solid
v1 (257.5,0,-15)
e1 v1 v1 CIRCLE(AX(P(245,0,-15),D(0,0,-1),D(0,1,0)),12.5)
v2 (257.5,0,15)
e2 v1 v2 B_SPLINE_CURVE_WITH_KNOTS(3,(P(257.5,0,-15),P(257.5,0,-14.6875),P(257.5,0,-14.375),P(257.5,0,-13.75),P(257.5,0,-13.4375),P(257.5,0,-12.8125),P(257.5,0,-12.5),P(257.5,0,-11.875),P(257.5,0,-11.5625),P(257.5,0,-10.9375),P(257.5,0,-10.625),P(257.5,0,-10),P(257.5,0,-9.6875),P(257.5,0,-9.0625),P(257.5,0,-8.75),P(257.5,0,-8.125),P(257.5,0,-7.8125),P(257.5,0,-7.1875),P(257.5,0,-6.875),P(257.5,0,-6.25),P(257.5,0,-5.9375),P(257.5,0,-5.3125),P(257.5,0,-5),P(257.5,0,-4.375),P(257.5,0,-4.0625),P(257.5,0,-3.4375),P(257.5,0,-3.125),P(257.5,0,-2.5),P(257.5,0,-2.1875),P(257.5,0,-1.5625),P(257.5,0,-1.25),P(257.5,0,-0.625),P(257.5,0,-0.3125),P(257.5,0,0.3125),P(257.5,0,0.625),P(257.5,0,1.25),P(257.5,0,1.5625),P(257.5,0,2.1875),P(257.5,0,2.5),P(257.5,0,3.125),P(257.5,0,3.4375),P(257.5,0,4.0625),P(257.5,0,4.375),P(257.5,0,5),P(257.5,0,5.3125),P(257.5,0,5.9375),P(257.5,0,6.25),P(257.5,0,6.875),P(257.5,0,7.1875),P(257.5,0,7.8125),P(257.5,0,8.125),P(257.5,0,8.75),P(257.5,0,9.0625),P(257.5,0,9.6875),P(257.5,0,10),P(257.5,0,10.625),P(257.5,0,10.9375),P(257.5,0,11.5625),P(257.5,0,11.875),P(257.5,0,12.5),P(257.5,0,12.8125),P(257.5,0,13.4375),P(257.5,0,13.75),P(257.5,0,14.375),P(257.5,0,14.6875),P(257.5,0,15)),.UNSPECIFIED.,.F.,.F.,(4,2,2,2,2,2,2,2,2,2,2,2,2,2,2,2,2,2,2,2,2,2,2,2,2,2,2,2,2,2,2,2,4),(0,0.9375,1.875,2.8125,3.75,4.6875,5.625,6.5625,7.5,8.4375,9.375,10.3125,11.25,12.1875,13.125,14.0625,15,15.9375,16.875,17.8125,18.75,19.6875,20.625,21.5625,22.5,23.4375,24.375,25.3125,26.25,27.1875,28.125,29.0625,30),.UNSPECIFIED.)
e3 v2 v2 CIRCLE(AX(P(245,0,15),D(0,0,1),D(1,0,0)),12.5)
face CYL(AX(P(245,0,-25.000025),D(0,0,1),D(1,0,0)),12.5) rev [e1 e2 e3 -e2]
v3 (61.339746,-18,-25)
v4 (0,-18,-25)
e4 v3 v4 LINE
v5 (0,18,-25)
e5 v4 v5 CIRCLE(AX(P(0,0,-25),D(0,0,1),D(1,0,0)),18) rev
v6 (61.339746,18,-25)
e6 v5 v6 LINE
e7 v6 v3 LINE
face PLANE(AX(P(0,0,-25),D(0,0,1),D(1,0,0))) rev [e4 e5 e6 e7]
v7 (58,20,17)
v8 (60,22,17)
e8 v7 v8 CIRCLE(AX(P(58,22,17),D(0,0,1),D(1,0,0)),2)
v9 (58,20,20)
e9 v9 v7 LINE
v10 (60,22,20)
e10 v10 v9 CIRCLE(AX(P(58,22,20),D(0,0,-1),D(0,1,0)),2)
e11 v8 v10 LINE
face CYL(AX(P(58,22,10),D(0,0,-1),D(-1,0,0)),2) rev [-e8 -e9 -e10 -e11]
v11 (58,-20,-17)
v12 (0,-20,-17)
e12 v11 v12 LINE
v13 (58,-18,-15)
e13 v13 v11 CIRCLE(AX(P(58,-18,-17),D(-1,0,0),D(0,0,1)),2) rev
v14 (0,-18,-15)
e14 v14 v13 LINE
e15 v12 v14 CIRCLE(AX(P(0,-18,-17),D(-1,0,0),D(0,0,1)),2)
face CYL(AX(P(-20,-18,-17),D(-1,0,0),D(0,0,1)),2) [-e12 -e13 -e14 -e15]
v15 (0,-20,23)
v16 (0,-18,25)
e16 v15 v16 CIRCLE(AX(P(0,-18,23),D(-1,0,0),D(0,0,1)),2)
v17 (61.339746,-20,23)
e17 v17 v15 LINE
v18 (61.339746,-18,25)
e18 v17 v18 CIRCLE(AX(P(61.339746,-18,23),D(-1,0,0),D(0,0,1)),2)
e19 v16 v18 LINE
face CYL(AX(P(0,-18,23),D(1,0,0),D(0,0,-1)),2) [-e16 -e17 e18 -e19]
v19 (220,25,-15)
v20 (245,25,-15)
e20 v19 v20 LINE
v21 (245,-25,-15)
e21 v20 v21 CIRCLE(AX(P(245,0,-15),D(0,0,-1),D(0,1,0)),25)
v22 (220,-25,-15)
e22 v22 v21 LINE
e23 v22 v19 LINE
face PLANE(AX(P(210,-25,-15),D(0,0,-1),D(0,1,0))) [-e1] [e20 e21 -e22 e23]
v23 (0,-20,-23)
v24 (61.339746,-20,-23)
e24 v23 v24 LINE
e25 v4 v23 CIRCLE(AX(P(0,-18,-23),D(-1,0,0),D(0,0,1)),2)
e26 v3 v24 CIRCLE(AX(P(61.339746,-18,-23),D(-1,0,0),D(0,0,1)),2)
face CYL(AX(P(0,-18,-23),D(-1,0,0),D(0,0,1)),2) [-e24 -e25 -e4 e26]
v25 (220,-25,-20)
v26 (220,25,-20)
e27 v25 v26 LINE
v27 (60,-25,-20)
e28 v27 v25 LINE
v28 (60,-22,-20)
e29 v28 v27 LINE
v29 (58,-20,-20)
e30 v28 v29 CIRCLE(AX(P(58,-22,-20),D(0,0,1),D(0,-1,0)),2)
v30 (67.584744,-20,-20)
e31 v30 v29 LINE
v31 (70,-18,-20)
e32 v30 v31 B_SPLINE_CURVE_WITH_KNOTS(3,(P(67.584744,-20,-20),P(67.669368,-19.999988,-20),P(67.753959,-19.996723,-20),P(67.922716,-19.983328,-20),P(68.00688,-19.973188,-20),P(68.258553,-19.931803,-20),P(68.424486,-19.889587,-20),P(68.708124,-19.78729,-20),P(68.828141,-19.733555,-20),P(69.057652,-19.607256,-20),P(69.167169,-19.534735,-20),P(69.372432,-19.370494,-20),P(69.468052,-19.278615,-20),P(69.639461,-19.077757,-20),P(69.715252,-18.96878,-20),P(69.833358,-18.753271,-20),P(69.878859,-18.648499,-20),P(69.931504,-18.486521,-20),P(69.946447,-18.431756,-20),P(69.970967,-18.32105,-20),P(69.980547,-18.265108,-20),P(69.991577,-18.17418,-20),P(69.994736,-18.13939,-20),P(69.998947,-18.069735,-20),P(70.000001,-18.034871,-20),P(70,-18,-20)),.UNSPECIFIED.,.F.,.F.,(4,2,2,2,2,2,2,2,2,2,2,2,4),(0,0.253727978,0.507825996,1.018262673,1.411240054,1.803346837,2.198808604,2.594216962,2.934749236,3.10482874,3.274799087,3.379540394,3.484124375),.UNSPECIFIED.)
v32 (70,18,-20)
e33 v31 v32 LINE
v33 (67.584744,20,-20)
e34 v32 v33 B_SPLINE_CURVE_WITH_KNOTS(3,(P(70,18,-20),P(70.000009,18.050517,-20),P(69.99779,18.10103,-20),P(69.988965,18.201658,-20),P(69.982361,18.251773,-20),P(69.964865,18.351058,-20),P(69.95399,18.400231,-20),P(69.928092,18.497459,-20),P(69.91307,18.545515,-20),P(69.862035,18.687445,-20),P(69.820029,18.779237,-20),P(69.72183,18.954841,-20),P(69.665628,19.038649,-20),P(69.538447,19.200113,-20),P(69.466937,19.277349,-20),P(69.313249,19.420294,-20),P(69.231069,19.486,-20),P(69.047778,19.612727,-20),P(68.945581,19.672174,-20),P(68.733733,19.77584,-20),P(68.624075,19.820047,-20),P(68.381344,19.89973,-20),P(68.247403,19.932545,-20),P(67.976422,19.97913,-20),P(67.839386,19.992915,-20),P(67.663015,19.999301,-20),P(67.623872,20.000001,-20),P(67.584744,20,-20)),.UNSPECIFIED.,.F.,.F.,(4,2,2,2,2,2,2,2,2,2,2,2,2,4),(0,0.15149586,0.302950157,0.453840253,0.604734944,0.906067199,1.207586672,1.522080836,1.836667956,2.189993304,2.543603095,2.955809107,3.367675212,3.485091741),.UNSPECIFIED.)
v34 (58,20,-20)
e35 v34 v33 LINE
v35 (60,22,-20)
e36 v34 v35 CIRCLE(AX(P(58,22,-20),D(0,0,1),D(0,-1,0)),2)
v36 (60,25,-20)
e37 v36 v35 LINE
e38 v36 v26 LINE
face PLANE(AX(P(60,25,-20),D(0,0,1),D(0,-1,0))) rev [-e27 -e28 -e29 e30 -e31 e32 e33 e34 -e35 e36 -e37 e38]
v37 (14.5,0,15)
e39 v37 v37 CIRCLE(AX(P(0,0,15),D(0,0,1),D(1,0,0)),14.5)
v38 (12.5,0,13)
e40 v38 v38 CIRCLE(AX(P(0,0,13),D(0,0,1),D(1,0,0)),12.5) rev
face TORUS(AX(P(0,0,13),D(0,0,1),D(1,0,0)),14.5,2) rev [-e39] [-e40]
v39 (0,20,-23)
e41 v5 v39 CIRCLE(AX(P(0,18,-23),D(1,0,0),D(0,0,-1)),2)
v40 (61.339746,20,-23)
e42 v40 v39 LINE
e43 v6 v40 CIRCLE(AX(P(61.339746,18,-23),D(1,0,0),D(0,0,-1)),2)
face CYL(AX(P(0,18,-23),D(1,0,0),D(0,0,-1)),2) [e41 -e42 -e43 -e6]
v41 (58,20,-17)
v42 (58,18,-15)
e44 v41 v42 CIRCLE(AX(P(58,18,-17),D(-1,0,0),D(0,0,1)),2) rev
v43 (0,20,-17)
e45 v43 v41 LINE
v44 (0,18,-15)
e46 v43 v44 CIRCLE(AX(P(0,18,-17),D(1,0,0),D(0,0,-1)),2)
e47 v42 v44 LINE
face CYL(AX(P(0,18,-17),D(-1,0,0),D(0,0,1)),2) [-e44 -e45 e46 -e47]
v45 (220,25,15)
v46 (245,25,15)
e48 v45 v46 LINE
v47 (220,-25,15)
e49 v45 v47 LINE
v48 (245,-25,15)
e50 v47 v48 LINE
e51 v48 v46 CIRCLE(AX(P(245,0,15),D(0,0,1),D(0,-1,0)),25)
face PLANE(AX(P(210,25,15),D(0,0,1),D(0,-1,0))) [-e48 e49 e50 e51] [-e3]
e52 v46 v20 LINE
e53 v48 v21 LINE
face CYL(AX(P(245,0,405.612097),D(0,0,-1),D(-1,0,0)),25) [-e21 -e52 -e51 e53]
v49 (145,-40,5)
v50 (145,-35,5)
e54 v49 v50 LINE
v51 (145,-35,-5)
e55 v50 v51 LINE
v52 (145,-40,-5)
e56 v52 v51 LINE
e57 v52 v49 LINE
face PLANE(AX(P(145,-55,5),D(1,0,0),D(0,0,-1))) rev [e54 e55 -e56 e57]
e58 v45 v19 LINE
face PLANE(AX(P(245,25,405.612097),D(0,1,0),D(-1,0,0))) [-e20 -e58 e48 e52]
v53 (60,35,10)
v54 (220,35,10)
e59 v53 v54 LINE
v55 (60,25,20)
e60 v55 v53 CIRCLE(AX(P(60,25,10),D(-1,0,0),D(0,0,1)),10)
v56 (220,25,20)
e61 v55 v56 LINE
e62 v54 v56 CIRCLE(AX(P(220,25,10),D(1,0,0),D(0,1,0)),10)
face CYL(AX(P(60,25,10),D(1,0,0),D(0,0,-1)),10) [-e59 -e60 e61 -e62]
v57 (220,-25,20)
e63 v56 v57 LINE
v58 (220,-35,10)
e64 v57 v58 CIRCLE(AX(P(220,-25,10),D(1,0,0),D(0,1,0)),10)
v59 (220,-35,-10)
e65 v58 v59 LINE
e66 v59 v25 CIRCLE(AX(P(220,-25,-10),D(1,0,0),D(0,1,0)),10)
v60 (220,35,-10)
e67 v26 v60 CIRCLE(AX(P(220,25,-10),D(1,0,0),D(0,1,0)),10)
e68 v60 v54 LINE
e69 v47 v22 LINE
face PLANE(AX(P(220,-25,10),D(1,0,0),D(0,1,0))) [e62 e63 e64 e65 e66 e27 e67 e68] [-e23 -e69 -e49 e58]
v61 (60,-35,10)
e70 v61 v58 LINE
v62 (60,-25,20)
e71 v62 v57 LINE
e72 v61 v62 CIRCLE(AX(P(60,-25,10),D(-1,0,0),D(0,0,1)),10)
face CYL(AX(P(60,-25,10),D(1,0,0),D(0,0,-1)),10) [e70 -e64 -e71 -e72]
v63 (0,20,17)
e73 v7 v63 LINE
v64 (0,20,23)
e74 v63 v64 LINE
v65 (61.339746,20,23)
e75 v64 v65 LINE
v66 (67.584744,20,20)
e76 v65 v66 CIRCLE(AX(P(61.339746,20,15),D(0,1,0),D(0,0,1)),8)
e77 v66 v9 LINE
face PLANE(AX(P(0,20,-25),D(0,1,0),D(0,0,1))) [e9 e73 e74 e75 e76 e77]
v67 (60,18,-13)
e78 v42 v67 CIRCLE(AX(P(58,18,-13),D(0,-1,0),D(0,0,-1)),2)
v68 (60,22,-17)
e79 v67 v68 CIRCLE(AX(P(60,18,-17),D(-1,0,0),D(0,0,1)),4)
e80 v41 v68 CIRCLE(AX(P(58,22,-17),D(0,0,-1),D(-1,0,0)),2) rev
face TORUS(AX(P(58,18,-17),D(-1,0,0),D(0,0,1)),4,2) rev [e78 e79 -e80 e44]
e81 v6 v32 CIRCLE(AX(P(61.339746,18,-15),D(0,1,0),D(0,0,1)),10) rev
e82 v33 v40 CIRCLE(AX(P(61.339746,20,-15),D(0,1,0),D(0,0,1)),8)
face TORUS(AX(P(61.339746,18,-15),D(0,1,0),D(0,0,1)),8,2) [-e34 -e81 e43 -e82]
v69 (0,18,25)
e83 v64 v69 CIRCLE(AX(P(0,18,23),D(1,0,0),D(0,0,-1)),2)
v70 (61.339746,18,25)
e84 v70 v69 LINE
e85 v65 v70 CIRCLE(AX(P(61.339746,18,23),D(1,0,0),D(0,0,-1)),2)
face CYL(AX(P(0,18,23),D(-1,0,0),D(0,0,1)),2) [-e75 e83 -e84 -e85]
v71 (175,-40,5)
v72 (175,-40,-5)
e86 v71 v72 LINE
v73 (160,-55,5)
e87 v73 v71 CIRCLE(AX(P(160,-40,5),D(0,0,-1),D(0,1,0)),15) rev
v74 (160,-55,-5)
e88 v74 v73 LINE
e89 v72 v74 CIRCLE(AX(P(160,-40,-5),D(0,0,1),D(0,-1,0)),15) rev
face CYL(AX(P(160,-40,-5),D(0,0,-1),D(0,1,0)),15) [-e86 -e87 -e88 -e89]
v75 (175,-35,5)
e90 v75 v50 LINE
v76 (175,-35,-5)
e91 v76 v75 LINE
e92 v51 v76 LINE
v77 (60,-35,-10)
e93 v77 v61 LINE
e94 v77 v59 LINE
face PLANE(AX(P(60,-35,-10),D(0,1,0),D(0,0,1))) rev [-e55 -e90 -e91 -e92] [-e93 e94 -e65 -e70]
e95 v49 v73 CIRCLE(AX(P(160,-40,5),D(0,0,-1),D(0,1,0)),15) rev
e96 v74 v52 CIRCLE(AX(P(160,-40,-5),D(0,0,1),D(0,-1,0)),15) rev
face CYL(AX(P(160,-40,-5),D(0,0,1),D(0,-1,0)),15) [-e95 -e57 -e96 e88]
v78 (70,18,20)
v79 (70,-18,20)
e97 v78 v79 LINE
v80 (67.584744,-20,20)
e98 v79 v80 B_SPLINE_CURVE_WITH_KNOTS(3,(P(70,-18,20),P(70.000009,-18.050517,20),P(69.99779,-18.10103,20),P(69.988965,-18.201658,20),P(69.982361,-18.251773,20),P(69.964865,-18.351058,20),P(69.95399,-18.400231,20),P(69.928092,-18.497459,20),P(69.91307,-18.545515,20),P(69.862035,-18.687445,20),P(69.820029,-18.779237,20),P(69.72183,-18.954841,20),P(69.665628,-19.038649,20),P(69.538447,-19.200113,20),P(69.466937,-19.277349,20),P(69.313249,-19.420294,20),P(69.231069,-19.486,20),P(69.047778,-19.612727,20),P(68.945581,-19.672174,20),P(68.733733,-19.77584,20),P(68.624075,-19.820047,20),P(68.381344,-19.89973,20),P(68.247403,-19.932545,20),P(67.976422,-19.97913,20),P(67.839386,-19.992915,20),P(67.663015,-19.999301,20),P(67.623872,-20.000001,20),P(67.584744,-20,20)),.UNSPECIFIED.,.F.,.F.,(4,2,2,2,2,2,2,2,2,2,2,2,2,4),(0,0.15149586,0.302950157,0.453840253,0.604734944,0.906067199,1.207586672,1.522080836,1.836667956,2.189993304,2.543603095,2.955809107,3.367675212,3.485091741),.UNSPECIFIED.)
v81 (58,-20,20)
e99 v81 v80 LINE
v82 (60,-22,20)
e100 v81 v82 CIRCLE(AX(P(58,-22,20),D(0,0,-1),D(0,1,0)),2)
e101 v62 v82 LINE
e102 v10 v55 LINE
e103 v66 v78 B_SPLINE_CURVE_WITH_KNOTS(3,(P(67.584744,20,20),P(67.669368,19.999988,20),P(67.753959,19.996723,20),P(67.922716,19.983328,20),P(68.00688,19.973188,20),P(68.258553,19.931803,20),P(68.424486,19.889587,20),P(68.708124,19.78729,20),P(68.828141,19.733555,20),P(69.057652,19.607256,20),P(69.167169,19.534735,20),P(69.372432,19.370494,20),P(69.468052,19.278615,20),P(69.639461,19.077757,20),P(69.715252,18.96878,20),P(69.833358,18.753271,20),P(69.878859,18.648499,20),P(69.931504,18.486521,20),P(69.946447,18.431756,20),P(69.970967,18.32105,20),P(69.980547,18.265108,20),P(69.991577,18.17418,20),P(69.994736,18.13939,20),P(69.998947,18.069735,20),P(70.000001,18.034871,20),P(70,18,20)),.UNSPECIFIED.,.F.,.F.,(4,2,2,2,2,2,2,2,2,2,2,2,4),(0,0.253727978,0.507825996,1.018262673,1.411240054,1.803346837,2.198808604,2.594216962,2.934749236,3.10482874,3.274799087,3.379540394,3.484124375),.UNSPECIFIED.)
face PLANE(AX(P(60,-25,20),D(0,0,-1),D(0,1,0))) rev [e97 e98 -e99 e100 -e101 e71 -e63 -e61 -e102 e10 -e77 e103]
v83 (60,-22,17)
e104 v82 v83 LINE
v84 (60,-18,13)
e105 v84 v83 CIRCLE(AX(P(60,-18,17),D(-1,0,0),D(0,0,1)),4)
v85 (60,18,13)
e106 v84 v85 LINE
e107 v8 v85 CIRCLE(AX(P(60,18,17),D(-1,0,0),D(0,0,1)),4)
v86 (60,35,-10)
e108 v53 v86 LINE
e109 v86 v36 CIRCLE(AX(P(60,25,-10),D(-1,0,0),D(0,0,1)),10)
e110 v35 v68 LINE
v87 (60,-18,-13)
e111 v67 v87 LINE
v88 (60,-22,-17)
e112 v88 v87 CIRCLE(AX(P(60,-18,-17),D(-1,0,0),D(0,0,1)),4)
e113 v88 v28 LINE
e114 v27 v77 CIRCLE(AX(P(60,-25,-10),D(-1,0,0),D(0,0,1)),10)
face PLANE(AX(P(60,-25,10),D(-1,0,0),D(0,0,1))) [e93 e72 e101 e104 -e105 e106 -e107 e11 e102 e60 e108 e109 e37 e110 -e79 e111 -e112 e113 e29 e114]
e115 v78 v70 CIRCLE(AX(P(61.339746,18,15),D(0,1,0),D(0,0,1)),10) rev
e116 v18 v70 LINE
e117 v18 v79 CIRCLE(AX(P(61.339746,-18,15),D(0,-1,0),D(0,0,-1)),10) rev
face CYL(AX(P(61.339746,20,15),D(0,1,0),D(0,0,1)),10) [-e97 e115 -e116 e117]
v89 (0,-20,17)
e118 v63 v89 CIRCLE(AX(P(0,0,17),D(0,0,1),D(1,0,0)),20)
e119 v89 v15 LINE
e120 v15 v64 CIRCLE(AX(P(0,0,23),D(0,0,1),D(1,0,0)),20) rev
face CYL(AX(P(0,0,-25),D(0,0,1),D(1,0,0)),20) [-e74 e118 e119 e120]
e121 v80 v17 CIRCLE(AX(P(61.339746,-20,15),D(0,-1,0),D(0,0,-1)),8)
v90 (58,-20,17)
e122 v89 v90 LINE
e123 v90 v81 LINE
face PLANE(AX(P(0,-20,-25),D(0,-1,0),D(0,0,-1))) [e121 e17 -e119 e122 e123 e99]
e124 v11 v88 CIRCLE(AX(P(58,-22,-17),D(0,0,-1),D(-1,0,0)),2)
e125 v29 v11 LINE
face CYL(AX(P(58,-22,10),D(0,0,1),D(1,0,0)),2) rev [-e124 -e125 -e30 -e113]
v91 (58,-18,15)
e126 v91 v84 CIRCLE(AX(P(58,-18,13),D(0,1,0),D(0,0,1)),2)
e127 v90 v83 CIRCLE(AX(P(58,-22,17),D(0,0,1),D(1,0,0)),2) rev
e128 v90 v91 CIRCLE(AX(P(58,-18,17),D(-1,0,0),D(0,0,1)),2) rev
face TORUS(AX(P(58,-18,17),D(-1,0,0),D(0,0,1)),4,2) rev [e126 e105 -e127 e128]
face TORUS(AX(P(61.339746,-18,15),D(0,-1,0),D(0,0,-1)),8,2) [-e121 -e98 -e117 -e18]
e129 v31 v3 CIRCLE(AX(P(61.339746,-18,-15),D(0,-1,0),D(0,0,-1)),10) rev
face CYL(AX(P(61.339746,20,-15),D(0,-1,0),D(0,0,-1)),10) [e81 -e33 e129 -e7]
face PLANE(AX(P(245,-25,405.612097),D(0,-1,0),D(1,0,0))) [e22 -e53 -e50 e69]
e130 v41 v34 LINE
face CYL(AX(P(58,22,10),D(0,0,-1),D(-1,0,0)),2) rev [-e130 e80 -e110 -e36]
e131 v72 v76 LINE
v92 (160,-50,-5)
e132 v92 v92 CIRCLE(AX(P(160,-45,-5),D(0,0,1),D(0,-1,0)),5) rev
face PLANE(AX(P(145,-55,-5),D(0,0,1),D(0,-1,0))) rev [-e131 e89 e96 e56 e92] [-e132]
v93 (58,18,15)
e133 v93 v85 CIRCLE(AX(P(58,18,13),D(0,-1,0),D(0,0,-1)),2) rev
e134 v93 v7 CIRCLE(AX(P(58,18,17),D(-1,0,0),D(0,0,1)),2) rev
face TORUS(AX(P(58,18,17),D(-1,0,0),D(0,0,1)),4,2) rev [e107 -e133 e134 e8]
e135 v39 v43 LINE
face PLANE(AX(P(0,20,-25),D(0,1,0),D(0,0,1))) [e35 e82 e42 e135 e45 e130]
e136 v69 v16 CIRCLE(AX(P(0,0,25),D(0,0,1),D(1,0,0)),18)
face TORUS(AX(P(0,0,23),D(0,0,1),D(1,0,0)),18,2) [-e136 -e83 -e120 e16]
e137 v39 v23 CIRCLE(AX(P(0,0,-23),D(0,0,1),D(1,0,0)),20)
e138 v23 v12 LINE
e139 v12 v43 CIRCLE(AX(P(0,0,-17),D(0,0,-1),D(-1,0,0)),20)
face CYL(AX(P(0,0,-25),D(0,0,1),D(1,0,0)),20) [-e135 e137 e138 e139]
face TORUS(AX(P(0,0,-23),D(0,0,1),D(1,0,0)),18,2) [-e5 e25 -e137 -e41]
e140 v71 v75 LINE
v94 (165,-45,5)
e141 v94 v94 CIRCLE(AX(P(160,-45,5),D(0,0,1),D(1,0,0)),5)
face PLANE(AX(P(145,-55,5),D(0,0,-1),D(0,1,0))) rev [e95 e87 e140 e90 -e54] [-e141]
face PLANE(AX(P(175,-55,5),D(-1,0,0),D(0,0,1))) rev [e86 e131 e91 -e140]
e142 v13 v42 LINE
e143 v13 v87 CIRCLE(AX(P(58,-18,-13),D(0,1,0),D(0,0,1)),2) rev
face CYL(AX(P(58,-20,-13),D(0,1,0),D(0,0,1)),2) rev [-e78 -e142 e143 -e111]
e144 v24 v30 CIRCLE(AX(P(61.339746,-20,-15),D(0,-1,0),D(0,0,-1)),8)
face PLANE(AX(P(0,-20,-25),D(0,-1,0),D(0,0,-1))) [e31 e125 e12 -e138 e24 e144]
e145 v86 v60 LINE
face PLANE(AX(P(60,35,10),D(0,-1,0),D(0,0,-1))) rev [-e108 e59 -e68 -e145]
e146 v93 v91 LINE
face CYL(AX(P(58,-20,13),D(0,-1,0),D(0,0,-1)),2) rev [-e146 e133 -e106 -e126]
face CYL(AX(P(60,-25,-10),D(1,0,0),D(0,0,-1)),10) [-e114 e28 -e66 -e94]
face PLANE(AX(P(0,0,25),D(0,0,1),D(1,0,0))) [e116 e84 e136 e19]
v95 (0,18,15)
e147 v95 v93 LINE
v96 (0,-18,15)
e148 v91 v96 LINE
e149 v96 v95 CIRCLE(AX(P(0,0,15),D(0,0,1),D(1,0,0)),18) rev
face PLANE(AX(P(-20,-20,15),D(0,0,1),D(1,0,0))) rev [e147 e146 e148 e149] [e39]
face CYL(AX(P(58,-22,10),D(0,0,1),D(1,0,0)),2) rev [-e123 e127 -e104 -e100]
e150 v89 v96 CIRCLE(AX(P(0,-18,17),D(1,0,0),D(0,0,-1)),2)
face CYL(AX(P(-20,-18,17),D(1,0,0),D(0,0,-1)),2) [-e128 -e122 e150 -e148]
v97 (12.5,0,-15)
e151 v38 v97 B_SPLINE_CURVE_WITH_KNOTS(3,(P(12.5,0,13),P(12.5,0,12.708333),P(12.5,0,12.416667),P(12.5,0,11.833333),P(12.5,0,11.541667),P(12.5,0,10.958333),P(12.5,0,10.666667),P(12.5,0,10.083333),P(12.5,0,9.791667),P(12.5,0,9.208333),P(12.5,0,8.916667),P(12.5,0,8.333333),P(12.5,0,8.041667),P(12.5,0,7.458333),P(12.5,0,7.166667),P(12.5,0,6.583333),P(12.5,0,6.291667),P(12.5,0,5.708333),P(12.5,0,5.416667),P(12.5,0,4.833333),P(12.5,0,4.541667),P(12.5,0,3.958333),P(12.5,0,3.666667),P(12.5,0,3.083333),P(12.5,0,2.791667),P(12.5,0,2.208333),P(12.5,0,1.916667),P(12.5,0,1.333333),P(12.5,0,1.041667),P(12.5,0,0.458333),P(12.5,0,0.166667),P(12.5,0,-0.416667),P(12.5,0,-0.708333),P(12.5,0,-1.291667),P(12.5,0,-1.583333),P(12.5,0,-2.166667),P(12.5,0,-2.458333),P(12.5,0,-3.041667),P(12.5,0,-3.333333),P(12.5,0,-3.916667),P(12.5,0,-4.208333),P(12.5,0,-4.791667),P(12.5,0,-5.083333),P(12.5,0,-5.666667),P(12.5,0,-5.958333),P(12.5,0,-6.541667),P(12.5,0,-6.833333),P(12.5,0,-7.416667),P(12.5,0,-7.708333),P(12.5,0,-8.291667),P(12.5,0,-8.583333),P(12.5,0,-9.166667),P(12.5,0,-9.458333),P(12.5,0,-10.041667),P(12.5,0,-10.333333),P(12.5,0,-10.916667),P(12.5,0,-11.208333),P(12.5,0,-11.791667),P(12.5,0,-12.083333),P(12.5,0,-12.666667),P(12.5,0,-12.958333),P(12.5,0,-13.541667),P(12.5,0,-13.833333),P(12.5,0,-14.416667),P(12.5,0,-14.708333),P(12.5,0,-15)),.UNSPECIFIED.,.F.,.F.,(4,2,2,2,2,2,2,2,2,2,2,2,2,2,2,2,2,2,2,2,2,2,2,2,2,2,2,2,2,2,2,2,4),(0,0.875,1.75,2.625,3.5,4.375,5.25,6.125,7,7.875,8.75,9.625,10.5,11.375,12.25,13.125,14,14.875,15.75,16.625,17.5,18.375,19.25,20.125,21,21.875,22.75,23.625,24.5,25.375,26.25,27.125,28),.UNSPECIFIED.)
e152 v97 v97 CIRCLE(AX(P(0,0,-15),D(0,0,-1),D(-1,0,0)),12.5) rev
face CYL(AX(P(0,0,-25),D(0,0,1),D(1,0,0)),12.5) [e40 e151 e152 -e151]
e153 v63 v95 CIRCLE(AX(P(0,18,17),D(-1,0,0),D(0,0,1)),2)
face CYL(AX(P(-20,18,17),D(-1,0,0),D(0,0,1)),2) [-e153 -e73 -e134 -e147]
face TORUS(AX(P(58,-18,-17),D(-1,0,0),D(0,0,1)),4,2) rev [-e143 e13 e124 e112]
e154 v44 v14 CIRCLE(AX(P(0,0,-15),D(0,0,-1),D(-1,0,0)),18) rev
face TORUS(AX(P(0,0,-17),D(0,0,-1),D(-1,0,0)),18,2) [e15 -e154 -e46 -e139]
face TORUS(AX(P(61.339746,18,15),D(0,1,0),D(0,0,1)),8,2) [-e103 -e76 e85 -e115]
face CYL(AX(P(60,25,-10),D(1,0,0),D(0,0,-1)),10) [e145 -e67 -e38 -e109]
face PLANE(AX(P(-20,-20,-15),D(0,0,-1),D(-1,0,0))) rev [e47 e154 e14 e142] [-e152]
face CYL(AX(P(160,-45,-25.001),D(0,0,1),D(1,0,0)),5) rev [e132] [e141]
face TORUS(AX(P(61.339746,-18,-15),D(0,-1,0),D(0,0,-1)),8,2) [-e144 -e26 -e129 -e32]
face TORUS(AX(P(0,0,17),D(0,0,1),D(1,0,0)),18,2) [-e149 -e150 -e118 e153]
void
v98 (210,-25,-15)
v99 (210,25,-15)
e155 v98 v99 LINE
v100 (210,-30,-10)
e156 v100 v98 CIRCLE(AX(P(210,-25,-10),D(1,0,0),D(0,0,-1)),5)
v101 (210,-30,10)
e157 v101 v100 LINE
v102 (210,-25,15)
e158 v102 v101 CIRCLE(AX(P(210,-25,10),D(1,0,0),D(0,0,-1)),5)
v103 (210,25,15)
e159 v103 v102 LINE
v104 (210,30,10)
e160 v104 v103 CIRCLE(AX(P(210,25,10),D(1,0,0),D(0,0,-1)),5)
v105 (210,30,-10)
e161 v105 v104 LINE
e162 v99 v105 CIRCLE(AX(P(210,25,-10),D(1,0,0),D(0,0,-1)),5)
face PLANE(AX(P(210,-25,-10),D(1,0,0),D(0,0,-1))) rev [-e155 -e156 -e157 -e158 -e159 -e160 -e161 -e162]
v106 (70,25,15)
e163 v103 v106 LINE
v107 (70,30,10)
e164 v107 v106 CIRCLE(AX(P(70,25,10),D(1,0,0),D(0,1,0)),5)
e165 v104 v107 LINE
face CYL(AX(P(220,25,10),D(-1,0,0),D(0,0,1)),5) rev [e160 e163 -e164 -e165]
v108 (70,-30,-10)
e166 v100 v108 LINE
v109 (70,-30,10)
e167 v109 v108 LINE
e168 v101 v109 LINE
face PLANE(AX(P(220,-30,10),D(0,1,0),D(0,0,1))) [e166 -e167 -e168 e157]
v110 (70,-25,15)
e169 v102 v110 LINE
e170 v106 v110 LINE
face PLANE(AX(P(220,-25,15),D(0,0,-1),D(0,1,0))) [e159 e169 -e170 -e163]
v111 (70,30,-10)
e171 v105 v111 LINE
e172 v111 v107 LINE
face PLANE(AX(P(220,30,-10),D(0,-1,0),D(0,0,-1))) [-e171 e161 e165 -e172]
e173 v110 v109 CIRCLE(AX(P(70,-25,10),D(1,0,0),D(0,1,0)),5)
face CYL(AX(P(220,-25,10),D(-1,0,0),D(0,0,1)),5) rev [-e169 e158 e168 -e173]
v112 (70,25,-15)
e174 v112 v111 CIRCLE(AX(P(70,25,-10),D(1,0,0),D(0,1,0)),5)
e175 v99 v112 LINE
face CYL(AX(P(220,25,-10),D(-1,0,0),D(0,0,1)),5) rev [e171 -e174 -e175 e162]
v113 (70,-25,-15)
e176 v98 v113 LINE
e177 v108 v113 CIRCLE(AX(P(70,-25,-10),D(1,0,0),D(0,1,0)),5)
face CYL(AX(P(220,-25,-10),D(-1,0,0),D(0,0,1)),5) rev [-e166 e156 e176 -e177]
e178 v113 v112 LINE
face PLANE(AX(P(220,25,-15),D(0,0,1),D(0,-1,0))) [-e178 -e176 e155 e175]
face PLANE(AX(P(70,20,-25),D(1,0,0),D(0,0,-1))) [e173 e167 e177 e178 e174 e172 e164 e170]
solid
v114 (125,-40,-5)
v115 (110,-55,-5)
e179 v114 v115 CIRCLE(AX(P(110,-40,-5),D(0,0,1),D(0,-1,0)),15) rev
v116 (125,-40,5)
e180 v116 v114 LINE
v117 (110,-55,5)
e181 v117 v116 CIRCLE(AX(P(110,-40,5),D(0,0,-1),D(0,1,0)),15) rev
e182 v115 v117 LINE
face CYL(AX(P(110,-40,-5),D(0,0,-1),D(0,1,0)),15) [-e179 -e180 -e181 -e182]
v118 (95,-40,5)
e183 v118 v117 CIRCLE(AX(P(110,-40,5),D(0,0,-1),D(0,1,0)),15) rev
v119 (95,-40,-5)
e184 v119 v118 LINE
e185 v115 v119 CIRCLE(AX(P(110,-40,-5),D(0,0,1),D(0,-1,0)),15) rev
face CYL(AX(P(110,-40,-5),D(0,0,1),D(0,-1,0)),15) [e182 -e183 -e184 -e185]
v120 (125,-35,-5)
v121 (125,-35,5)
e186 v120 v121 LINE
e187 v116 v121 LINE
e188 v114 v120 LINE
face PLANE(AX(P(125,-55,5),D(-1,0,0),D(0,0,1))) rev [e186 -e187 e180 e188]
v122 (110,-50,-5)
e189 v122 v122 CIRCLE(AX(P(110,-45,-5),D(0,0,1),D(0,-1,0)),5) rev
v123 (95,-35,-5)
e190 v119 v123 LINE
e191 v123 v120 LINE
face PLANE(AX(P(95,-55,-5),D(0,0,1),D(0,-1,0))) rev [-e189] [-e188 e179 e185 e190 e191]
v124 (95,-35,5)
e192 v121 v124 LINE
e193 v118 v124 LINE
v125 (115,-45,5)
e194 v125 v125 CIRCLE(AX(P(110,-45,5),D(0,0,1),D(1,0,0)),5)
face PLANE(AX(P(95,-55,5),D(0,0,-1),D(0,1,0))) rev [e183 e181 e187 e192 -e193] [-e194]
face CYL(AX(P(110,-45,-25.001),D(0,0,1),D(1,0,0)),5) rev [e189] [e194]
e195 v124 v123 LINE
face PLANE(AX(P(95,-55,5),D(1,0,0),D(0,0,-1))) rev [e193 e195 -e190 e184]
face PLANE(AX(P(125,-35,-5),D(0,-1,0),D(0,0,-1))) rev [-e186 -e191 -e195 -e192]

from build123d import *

# Parameters (mm, degrees)
BOSS_EXTRUDE1_DEPTH      = 25
BOSS_EXTRUDE1_DEPTH_BACK = 25
SKETCH2_W                = 30
SKETCH2_H                = 40
CUT_EXTRUDE1_DEPTH       = 96.524865873
BOSS_EXTRUDE2_REACH      = 90.318
SKETCH3_R                = 12.5
STRUCTURAL_MEMBER1_DEPTH = 150
BOSS_EXTRUDE3_DEPTH      = 10
BOSS_EXTRUDE4_DEPTH      = 50
BOSS_EXTRUDE4_DEPTH_BACK = 10
CUT_EXTRUDE6_START       = -30
CUT_EXTRUDE6_DEPTH       = 30
SKETCH16_R               = 12.5
CUT_EXTRUDE7_DEPTH       = 276.181758116
FILLET1_R                = 10
FILLET2_R                = 2
FILLET3_R                = 2
SKETCH19_W               = 30
SKETCH19_H               = 10
BOSS_EXTRUDE6_DEPTH      = 20
FILLET5_R                = 15
SKETCH20_R               = 5
CUT_EXTRUDE9_DEPTH       = 10
LPATTERN2_COUNT          = 2
LPATTERN2_PITCH          = 50
FILLET5_OF_LPATTERN2_R   = 15


# Read off the part's stored shape, not the designer's step: Cut-Extrude6
# Some blends are built 0.0001 mm under size
with BuildPart() as part:
    # Sketch1 → Boss-Extrude1 (new, two sides: drawn at the far end of the back side and taken through both)
    with BuildSketch(Plane.XY.offset(-BOSS_EXTRUDE1_DEPTH_BACK)):
        with BuildLine():
            Line((0, 20), (70, 20))
            Line((70, 20), (70, -20))
            Line((70, -20), (0, -20))
            ThreePointArc((0, -20), (-20, 0), (0, 20))
        make_face()
    extrude(amount=BOSS_EXTRUDE1_DEPTH + BOSS_EXTRUDE1_DEPTH_BACK)

    # Sketch2 → Cut-Extrude1 (cut, through all)
    with BuildSketch(Plane(origin=(70, 0, 0), x_dir=(0, 0, -1), z_dir=(1, 0, 0))):
        Rectangle(SKETCH2_W, SKETCH2_H)
    extrude(amount=-CUT_EXTRUDE1_DEPTH, mode=Mode.SUBTRACT)


with BuildPart() as cut_extrude1_piece_1:
    # of the separate pieces the step leaves, piece 1, a body of its own (cut_extrude1_pieces)
    add(part.part.solids().sort_by_distance((0, 20, -25))[0])

    # Sketch3 → Boss-Extrude2 (add, up to next)
    with BuildSketch(Plane.XY.offset(25), mode=Mode.PRIVATE) as boss_extrude2_sk1:
        Circle(SKETCH3_R)
    boss_extrude2_tool1 = extrude(boss_extrude2_sk1.sketch, amount=-BOSS_EXTRUDE2_REACH, mode=Mode.PRIVATE) - cut_extrude1_piece_1.part


with BuildPart() as cut_extrude1_piece_2:
    # of the separate pieces the step leaves, piece 2, a body of its own (cut_extrude1_pieces)
    add(part.part.solids().sort_by_distance((0, 20, 15))[0])


with BuildPart() as cut_extrude1_piece_1_1:
    add(cut_extrude1_piece_1.part)

    add(cut_extrude1_piece_2.part)  # Boss-Extrude2 merges Cut-Extrude1 piece 2
    add(boss_extrude2_tool1.solids().sort_by_distance((0, 0, 25))[0])



with BuildPart() as body_2:
    # Sketch11 → Structural Member1 (new body)
    with BuildSketch(Plane(origin=(70, 0, 0), x_dir=(0, 0, 1), z_dir=(1, 0, 0))):
        with BuildLine():
            Line((-10, -35), (10, -35))
            ThreePointArc((10, -35), (17.071067812, -32.071067812), (20, -25))
            Line((20, -25), (20, 25))
            ThreePointArc((20, 25), (17.071067812, 32.071067812), (10, 35))
            Line((10, 35), (-10, 35))
            ThreePointArc((-10, 35), (-17.071067812, 32.071067812), (-20, 25))
            Line((-20, 25), (-20, -25))
            ThreePointArc((-20, -25), (-17.071067812, -32.071067812), (-10, -35))
        make_face()
        with BuildLine():
            Line((-10, -30), (10, -30))
            ThreePointArc((10, -30), (13.535533906, -28.535533906), (15, -25))
            Line((15, -25), (15, 25))
            ThreePointArc((15, 25), (13.535533906, 28.535533906), (10, 30))
            Line((10, 30), (-10, 30))
            ThreePointArc((-10, 30), (-13.535533906, 28.535533906), (-15, 25))
            Line((-15, 25), (-15, -25))
            ThreePointArc((-15, -25), (-13.535533906, -28.535533906), (-10, -30))
        make_face(mode=Mode.SUBTRACT)
    extrude(amount=STRUCTURAL_MEMBER1_DEPTH)


with BuildPart() as cut_extrude1_piece_1_2:
    add(cut_extrude1_piece_1_1.part)

    add(body_2.part)  # Boss-Extrude3 merges body 2
    # Sketch12 → Boss-Extrude3 (add)
    with BuildSketch(Plane.ZY.offset(-70)):
        with BuildLine():
            Line((20, -25), (20, 25))
            ThreePointArc((20, 25), (17.071067812, 32.071067812), (10, 35))
            Line((10, 35), (-10, 35))
            ThreePointArc((-10, 35), (-17.071067812, 32.071067812), (-20, 25))
            Line((-20, 25), (-20, -25))
            ThreePointArc((-20, -25), (-17.071067812, -32.071067812), (-10, -35))
            Line((-10, -35), (10, -35))
            ThreePointArc((10, -35), (17.071067812, -32.071067812), (20, -25))
        make_face()
    extrude(amount=BOSS_EXTRUDE3_DEPTH)

    # Sketch14 → Boss-Extrude4 (add, two sides: drawn at the far end of the back side and taken through both)
    with BuildSketch(Plane(origin=(220, 0, 0), x_dir=(0, 0, -1), z_dir=(1, 0, 0)).offset(-BOSS_EXTRUDE4_DEPTH_BACK)):
        with BuildLine():
            Line((15, -25), (15, 25))
            ThreePointArc((15, 25), (13.535533906, 28.535533906), (10, 30))
            Line((10, 30), (-10, 30))
            ThreePointArc((-10, 30), (-13.535533906, 28.535533906), (-15, 25))
            Line((-15, 25), (-15, -25))
            ThreePointArc((-15, -25), (-13.535533906, -28.535533906), (-10, -30))
            Line((-10, -30), (10, -30))
            ThreePointArc((10, -30), (13.535533906, -28.535533906), (15, -25))
        make_face()
    extrude(amount=BOSS_EXTRUDE4_DEPTH + BOSS_EXTRUDE4_DEPTH_BACK)

    # Cut-Extrude6 outline → Cut-Extrude6 (cut)
    with BuildSketch(Plane.XY.offset(15).offset(CUT_EXTRUDE6_START)):
        with BuildLine():
            Line((220, -25), (220, -30))
            Line((220, -30), (270, -30))
            Line((270, -30), (270, -2.73e-07))
            ThreePointArc((270, -2.73e-07), (262.677669433, -17.677669626), (245, -25))
            Line((245, -25), (220, -25))
        make_face()
        with BuildLine():
            Line((220, 30), (220, 25))
            Line((220, 25), (245, 25))
            ThreePointArc((245, 25), (262.677669626, 17.677669433), (270, -2.73e-07))
            Line((270, -2.73e-07), (270, 30))
            Line((270, 30), (220, 30))
        make_face()
    extrude(amount=CUT_EXTRUDE6_DEPTH, mode=Mode.SUBTRACT)

    # Sketch16 → Cut-Extrude7 (cut, through all)
    with BuildSketch(Plane.XY.offset(15)):
        with Locations((245, 0)):
            Circle(SKETCH16_R)
    extrude(amount=-CUT_EXTRUDE7_DEPTH, mode=Mode.SUBTRACT)

    # Fillet1
    # the kernel refuses this fillet: 10 mm, written as the material it takes off along each edge
    with BuildSketch(Plane(origin=(70, 41.650635095, -25), x_dir=(0, 0, 1), z_dir=(0, -1, 0))) as fillet1_piece_1:
        with BuildLine():
            CenterArc((10, 8.660254038), FILLET1_R, 180, 60)
            Line((0, 8.660254038), (-0.2, 8.660254038))
            Line((-0.2, 8.660254038), (-0.2, 0))
            Line((-0.2, 0), (0, -0.2))
            ThreePointArc((0, -0.2), (2.5, -0.2), (4.9, -0.173205081))
            Line((4.9, -0.173205081), (5, 0))
        make_face()
    extrude(amount=83.301270189, mode=Mode.SUBTRACT)
    with BuildSketch(Plane(origin=(70, 41.650635095, 25), x_dir=(0, 0, -1), z_dir=(0, -1, 0))) as fillet1_piece_2:
        with BuildLine():
            CenterArc((10, -8.660254038), FILLET1_R, 120, 60)
            Line((0, -8.660254038), (-0.2, -8.660254038))
            Line((-0.2, -8.660254038), (-0.2, 0))
            Line((-0.2, 0), (0, 0.2))
            ThreePointArc((0, 0.2), (2.5, 0.2), (4.9, 0.173205081))
            Line((4.9, 0.173205081), (5, 0))
        make_face()
    extrude(amount=83.301270189, mode=Mode.SUBTRACT)

    # Fillet2
    fillet2_edges = [cut_extrude1_piece_1_2.edges().sort_by_distance(p)[0] for p in [
        (-12.5, 0, 15),
        (30, 20, -15),
        (-20, 0, -15),
        (30, -20, -15),
        (-20, 0, 15),
        (30, 20, 15),
        (60, 0, -15),
        (30, -20, 15),
        (60, 0, 15),
        (60, 20, 17.5),
        (60, 20, -17.5),
        (60, -20, -17.5),
        (60, -20, 17.5),
    ]]
    fillet(fillet2_edges, radius=FILLET2_R)

    # Fillet3
    fillet3_edges = [cut_extrude1_piece_1_2.edges().sort_by_distance(p)[0] for p in [
        (66.339745962, 20, 23.660254038),
        (30.669872981, 20, 25),
        (-20, 0, 25),
        (66.339745962, -20, 23.660254038),
        (66.339745962, 20, -23.660254038),
        (30.669872981, 20, -25),
        (-20, 0, -25),
        (66.339745962, -20, -23.660254038),
        (30.669872981, -20, 25),
        (30.669872981, -20, -25),
    ]]
    fillet(fillet3_edges, radius=FILLET3_R)


with BuildPart() as body_2_2:
    # Sketch19 → Boss-Extrude6 (new body)
    with BuildSketch(Plane.XZ.offset(35)):
        with Locations((110, 0)):
            Rectangle(SKETCH19_W, SKETCH19_H)
    boss_extrude6 = extrude(amount=BOSS_EXTRUDE6_DEPTH)

    # Fillet5
    fillet5_edges = [body_2_2.edges().sort_by_distance(p)[0] for p in [
        (95, -55, 0),
        (125, -55, 0),
    ]]
    fillet(fillet5_edges, radius=FILLET5_R - 0.0001)  # a hair under: the kernel refuses the full size

    # Sketch20 → Cut-Extrude9 (cut)
    with BuildSketch(Plane.XY.offset(5)):
        with Locations((110, -45)):
            Circle(SKETCH20_R)
    cut_extrude9 = extrude(amount=-CUT_EXTRUDE9_DEPTH, mode=Mode.SUBTRACT)


with BuildPart() as cut_extrude1_piece_1_3:
    add(cut_extrude1_piece_1_2.part)

    # LPattern2: Boss-Extrude6, Cut-Extrude9 ×2
    with Locations(*[(i * LPATTERN2_PITCH, 0, 0) for i in range(1, LPATTERN2_COUNT)]):
        add(boss_extrude6)
        add(cut_extrude9, mode=Mode.SUBTRACT)

    # Fillet5 of LPattern2
    fillet5_of_lpattern2_edges = [cut_extrude1_piece_1_3.edges().sort_by_distance(p)[0] for p in [
        (145, -55, 0),
        (175, -55, 0),
    ]]
    fillet(fillet5_of_lpattern2_edges, radius=FILLET5_OF_LPATTERN2_R - 0.0001)  # a hair under: the kernel refuses the full size


solid = Compound([body_2_2.part, cut_extrude1_piece_1_3.part])
